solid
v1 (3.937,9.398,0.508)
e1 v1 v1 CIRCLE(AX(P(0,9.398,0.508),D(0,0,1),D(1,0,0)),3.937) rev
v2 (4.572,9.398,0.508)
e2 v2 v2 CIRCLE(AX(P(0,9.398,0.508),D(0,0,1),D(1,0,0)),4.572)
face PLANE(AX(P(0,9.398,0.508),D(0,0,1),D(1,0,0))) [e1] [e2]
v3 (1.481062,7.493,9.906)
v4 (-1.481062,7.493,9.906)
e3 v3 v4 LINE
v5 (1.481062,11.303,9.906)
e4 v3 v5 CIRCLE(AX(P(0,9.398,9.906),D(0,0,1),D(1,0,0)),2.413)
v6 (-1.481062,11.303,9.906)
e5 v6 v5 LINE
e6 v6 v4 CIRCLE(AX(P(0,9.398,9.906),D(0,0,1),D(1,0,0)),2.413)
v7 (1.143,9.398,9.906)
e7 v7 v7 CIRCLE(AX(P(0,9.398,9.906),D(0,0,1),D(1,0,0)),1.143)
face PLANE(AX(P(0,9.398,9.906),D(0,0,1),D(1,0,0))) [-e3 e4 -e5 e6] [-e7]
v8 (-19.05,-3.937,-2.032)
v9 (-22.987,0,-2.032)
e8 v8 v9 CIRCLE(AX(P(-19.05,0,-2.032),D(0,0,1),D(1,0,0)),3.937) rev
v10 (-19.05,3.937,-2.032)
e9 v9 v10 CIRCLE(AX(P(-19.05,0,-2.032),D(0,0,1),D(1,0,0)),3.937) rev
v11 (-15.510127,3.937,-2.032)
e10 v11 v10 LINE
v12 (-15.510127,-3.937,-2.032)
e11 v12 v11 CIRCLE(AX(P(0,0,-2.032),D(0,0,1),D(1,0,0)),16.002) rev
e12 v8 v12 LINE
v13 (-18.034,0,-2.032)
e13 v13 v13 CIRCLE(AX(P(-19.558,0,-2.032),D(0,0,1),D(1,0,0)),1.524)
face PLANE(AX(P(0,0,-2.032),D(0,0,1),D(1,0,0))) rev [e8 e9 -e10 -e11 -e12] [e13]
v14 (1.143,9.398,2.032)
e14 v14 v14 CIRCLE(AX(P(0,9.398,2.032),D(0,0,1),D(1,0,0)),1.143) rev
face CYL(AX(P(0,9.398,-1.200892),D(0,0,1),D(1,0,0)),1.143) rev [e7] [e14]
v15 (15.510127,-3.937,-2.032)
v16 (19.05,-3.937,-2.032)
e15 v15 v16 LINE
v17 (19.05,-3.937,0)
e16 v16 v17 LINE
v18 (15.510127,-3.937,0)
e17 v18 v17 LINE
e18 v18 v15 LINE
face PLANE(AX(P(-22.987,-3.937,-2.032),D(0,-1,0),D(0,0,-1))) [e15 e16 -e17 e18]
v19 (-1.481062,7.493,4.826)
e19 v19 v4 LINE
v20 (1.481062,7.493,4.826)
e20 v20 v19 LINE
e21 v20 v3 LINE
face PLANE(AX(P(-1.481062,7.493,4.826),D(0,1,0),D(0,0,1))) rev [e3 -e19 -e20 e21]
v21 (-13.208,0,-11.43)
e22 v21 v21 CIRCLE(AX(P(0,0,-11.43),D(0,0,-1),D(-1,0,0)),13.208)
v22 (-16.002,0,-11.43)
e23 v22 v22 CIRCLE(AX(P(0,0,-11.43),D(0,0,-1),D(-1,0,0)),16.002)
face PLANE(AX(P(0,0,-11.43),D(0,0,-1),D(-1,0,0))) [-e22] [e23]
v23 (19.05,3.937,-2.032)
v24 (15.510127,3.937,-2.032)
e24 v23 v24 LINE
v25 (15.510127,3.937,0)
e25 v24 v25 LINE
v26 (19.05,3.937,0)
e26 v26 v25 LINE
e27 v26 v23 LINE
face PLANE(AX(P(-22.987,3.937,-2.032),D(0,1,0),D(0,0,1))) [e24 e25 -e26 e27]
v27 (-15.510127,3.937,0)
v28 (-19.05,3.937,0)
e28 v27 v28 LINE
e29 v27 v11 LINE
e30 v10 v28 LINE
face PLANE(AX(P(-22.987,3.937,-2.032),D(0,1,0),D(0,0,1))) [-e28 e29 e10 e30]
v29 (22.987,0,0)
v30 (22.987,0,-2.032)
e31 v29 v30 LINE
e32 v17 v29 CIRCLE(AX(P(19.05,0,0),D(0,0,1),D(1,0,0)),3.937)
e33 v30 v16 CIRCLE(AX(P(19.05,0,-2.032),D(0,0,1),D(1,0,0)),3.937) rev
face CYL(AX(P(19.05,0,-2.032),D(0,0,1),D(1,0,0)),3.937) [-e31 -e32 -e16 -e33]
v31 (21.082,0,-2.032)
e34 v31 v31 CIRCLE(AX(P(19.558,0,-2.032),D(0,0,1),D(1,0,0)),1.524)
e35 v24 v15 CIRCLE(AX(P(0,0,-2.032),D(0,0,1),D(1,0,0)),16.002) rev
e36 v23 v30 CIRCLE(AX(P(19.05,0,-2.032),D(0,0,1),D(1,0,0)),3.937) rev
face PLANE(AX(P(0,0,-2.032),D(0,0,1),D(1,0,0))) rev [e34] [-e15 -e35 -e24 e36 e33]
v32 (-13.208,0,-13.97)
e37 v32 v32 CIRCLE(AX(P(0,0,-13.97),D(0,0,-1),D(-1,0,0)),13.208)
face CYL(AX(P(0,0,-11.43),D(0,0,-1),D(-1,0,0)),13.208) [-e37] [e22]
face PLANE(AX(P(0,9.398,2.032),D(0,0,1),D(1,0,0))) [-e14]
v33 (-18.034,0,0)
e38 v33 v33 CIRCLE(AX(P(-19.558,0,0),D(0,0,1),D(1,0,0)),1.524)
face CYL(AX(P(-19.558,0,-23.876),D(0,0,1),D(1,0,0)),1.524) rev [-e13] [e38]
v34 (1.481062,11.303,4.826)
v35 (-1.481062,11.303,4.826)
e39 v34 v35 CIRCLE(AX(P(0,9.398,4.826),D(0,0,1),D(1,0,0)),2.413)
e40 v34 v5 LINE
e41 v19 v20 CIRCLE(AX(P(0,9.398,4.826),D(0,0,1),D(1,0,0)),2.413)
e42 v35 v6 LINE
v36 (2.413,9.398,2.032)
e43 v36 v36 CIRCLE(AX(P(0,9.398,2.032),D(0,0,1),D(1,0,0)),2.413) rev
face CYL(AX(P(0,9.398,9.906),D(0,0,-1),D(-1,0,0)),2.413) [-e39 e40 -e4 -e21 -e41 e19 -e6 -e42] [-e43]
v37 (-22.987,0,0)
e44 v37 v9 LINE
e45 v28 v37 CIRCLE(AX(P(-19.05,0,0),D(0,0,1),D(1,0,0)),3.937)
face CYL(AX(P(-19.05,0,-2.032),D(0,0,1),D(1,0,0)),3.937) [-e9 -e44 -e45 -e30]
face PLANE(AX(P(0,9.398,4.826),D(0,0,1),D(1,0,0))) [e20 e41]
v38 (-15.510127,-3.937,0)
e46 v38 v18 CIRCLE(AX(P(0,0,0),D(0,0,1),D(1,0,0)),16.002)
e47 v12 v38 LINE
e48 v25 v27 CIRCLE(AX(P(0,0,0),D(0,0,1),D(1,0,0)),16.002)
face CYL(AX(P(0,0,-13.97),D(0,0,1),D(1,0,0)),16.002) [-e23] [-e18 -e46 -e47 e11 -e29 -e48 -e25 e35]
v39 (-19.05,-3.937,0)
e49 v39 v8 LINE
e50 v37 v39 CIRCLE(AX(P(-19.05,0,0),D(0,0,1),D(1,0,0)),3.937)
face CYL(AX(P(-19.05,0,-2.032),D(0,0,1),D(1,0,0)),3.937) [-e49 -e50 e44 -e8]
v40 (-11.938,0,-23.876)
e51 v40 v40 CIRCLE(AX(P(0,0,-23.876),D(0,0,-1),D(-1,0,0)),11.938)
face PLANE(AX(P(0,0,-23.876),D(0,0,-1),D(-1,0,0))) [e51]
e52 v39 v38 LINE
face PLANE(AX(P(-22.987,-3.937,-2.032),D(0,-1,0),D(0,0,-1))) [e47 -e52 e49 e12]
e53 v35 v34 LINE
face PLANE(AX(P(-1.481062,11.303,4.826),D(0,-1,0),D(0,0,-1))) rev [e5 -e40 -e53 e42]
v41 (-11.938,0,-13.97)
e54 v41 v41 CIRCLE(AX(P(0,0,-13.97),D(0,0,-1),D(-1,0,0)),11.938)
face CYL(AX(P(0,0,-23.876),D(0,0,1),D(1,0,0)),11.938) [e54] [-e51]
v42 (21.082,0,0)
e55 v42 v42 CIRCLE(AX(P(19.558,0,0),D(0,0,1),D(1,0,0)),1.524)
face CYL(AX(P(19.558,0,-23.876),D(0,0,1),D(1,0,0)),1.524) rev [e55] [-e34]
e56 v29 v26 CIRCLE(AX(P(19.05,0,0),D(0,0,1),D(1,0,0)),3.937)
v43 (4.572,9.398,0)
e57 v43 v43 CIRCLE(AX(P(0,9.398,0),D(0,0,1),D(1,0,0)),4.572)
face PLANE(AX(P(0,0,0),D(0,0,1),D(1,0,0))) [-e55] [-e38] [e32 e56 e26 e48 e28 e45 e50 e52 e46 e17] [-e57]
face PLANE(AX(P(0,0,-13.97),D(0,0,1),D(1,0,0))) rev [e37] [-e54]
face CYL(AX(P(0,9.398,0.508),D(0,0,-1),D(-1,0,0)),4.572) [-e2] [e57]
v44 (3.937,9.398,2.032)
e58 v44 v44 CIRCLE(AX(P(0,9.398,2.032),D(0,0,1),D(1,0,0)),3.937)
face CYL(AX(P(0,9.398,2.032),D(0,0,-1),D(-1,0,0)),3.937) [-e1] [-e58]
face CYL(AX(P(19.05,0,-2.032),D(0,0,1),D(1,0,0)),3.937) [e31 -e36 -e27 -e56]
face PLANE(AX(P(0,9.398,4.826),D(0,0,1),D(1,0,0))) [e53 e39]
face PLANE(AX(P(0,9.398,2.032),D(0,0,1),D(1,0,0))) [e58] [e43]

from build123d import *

# Parameters (mm, degrees)
SKETCH1_R               = 16.002
BOSS_EXTRUDE1_DEPTH     = 13.97
SKETCH2_R               = 11.938
BOSS_EXTRUDE2_DEPTH     = 9.906
CUT_EXTRUDE1_START      = -2.54
SKETCH3_R               = 16.002
SKETCH3_R_2             = 13.208
CUT_EXTRUDE1_DEPTH      = 2.54
SKETCH4_W               = 45.974
SKETCH4_H               = 7.874
BOSS_EXTRUDE3_DEPTH     = 2.032
CUT_EXTRUDE2_DEPTH      = 37.803933879
CUT_EXTRUDE2_DEPTH_BACK = 37.803933879
SKETCH5_R               = 1.524
FILLET1_R               = 3.937
SKETCH6_R               = 4.572
BOSS_EXTRUDE4_DEPTH     = 0.508
SKETCH7_R               = 3.937
BOSS_EXTRUDE5_DEPTH     = 2.032
SKETCH8_R               = 2.413
BOSS_EXTRUDE6_DEPTH     = 9.906
CUT_EXTRUDE3_DEPTH      = 44.88268106
CUT_EXTRUDE3_DEPTH_BACK = 5.08
SKETCH10_R              = 1.143
CUT_EXTRUDE4_DEPTH      = 7.874


with BuildPart() as part:
    # Sketch1 → Boss-Extrude1 (new body)
    with BuildSketch(Plane.XY):
        Circle(SKETCH1_R)
    extrude(amount=-BOSS_EXTRUDE1_DEPTH)

    # Sketch2 → Boss-Extrude2 (add)
    with BuildSketch(Plane(origin=(0, 0, -13.97), x_dir=(-1, 0, 0), z_dir=(0, 0, -1))):
        Circle(SKETCH2_R)
    extrude(amount=BOSS_EXTRUDE2_DEPTH)

    # Sketch3 → Cut-Extrude1 (cut)
    with BuildSketch(Plane(origin=(0, 0, -13.97), x_dir=(-1, 0, 0), z_dir=(0, 0, -1)).offset(CUT_EXTRUDE1_START)):
        with Locations(Location((0, 0, 0), (0, 0, 180))):
            Circle(SKETCH3_R)
        Circle(SKETCH3_R_2, mode=Mode.SUBTRACT)
    extrude(amount=CUT_EXTRUDE1_DEPTH, mode=Mode.SUBTRACT)

    # Sketch4 → Boss-Extrude3 (add)
    with BuildSketch(Plane.XY):
        Rectangle(SKETCH4_W, SKETCH4_H)
    extrude(amount=-BOSS_EXTRUDE3_DEPTH)

    # Sketch5 → Cut-Extrude2 (cut, two sides: drawn at the far end of the back side and taken through both)
    with BuildSketch(Plane.XY.offset(-CUT_EXTRUDE2_DEPTH_BACK)):
        with Locations((-19.558, 0)):
            Circle(SKETCH5_R)
        with Locations((19.558, 0)):
            Circle(SKETCH5_R)
    extrude(amount=CUT_EXTRUDE2_DEPTH + CUT_EXTRUDE2_DEPTH_BACK, mode=Mode.SUBTRACT)

    # Fillet1
    fillet1_edges = [part.edges().sort_by_distance(p)[0] for p in [
        (22.987, 3.937, -1.016),
        (22.987, -3.937, -1.016),
        (-22.987, -3.937, -1.016),
        (-22.987, 3.937, -1.016),
    ]]
    fillet(fillet1_edges, radius=FILLET1_R - 0.0001)  # a hair under: the kernel refuses the full size

    # Sketch6 → Boss-Extrude4 (add)
    with BuildSketch(Plane.XY):
        with Locations((0, 9.398)):
            Circle(SKETCH6_R)
    extrude(amount=BOSS_EXTRUDE4_DEPTH)

    # Sketch7 → Boss-Extrude5 (add)
    with BuildSketch(Plane.XY):
        with Locations((0, 9.398)):
            Circle(SKETCH7_R)
    extrude(amount=BOSS_EXTRUDE5_DEPTH)

    # Sketch8 → Boss-Extrude6 (add)
    with BuildSketch(Plane.XY):
        with Locations((0, 9.398)):
            Circle(SKETCH8_R)
    extrude(amount=BOSS_EXTRUDE6_DEPTH)

    # Sketch9 → Cut-Extrude3 (cut, two sides: drawn at the far end of the back side and taken through both)
    with BuildSketch(Plane.XY.offset(9.906).offset(-CUT_EXTRUDE3_DEPTH_BACK)):
        with BuildLine():
            Line((-1.481061781, 11.303), (1.481061781, 11.303))
            ThreePointArc((1.481061781, 11.303), (0, 11.811), (-1.481061781, 11.303))
        make_face()
        with BuildLine():
            Line((-1.481061781, 7.493), (1.481061781, 7.493))
            ThreePointArc((1.481061781, 7.493), (0, 6.985), (-1.481061781, 7.493))
        make_face()
    extrude(amount=CUT_EXTRUDE3_DEPTH + CUT_EXTRUDE3_DEPTH_BACK, mode=Mode.SUBTRACT)

    # Sketch10 → Cut-Extrude4 (cut)
    with BuildSketch(Plane.XY.offset(9.906)):
        with Locations((0, 9.398)):
            Circle(SKETCH10_R)
    extrude(amount=-CUT_EXTRUDE4_DEPTH, mode=Mode.SUBTRACT)


solid = part.part
